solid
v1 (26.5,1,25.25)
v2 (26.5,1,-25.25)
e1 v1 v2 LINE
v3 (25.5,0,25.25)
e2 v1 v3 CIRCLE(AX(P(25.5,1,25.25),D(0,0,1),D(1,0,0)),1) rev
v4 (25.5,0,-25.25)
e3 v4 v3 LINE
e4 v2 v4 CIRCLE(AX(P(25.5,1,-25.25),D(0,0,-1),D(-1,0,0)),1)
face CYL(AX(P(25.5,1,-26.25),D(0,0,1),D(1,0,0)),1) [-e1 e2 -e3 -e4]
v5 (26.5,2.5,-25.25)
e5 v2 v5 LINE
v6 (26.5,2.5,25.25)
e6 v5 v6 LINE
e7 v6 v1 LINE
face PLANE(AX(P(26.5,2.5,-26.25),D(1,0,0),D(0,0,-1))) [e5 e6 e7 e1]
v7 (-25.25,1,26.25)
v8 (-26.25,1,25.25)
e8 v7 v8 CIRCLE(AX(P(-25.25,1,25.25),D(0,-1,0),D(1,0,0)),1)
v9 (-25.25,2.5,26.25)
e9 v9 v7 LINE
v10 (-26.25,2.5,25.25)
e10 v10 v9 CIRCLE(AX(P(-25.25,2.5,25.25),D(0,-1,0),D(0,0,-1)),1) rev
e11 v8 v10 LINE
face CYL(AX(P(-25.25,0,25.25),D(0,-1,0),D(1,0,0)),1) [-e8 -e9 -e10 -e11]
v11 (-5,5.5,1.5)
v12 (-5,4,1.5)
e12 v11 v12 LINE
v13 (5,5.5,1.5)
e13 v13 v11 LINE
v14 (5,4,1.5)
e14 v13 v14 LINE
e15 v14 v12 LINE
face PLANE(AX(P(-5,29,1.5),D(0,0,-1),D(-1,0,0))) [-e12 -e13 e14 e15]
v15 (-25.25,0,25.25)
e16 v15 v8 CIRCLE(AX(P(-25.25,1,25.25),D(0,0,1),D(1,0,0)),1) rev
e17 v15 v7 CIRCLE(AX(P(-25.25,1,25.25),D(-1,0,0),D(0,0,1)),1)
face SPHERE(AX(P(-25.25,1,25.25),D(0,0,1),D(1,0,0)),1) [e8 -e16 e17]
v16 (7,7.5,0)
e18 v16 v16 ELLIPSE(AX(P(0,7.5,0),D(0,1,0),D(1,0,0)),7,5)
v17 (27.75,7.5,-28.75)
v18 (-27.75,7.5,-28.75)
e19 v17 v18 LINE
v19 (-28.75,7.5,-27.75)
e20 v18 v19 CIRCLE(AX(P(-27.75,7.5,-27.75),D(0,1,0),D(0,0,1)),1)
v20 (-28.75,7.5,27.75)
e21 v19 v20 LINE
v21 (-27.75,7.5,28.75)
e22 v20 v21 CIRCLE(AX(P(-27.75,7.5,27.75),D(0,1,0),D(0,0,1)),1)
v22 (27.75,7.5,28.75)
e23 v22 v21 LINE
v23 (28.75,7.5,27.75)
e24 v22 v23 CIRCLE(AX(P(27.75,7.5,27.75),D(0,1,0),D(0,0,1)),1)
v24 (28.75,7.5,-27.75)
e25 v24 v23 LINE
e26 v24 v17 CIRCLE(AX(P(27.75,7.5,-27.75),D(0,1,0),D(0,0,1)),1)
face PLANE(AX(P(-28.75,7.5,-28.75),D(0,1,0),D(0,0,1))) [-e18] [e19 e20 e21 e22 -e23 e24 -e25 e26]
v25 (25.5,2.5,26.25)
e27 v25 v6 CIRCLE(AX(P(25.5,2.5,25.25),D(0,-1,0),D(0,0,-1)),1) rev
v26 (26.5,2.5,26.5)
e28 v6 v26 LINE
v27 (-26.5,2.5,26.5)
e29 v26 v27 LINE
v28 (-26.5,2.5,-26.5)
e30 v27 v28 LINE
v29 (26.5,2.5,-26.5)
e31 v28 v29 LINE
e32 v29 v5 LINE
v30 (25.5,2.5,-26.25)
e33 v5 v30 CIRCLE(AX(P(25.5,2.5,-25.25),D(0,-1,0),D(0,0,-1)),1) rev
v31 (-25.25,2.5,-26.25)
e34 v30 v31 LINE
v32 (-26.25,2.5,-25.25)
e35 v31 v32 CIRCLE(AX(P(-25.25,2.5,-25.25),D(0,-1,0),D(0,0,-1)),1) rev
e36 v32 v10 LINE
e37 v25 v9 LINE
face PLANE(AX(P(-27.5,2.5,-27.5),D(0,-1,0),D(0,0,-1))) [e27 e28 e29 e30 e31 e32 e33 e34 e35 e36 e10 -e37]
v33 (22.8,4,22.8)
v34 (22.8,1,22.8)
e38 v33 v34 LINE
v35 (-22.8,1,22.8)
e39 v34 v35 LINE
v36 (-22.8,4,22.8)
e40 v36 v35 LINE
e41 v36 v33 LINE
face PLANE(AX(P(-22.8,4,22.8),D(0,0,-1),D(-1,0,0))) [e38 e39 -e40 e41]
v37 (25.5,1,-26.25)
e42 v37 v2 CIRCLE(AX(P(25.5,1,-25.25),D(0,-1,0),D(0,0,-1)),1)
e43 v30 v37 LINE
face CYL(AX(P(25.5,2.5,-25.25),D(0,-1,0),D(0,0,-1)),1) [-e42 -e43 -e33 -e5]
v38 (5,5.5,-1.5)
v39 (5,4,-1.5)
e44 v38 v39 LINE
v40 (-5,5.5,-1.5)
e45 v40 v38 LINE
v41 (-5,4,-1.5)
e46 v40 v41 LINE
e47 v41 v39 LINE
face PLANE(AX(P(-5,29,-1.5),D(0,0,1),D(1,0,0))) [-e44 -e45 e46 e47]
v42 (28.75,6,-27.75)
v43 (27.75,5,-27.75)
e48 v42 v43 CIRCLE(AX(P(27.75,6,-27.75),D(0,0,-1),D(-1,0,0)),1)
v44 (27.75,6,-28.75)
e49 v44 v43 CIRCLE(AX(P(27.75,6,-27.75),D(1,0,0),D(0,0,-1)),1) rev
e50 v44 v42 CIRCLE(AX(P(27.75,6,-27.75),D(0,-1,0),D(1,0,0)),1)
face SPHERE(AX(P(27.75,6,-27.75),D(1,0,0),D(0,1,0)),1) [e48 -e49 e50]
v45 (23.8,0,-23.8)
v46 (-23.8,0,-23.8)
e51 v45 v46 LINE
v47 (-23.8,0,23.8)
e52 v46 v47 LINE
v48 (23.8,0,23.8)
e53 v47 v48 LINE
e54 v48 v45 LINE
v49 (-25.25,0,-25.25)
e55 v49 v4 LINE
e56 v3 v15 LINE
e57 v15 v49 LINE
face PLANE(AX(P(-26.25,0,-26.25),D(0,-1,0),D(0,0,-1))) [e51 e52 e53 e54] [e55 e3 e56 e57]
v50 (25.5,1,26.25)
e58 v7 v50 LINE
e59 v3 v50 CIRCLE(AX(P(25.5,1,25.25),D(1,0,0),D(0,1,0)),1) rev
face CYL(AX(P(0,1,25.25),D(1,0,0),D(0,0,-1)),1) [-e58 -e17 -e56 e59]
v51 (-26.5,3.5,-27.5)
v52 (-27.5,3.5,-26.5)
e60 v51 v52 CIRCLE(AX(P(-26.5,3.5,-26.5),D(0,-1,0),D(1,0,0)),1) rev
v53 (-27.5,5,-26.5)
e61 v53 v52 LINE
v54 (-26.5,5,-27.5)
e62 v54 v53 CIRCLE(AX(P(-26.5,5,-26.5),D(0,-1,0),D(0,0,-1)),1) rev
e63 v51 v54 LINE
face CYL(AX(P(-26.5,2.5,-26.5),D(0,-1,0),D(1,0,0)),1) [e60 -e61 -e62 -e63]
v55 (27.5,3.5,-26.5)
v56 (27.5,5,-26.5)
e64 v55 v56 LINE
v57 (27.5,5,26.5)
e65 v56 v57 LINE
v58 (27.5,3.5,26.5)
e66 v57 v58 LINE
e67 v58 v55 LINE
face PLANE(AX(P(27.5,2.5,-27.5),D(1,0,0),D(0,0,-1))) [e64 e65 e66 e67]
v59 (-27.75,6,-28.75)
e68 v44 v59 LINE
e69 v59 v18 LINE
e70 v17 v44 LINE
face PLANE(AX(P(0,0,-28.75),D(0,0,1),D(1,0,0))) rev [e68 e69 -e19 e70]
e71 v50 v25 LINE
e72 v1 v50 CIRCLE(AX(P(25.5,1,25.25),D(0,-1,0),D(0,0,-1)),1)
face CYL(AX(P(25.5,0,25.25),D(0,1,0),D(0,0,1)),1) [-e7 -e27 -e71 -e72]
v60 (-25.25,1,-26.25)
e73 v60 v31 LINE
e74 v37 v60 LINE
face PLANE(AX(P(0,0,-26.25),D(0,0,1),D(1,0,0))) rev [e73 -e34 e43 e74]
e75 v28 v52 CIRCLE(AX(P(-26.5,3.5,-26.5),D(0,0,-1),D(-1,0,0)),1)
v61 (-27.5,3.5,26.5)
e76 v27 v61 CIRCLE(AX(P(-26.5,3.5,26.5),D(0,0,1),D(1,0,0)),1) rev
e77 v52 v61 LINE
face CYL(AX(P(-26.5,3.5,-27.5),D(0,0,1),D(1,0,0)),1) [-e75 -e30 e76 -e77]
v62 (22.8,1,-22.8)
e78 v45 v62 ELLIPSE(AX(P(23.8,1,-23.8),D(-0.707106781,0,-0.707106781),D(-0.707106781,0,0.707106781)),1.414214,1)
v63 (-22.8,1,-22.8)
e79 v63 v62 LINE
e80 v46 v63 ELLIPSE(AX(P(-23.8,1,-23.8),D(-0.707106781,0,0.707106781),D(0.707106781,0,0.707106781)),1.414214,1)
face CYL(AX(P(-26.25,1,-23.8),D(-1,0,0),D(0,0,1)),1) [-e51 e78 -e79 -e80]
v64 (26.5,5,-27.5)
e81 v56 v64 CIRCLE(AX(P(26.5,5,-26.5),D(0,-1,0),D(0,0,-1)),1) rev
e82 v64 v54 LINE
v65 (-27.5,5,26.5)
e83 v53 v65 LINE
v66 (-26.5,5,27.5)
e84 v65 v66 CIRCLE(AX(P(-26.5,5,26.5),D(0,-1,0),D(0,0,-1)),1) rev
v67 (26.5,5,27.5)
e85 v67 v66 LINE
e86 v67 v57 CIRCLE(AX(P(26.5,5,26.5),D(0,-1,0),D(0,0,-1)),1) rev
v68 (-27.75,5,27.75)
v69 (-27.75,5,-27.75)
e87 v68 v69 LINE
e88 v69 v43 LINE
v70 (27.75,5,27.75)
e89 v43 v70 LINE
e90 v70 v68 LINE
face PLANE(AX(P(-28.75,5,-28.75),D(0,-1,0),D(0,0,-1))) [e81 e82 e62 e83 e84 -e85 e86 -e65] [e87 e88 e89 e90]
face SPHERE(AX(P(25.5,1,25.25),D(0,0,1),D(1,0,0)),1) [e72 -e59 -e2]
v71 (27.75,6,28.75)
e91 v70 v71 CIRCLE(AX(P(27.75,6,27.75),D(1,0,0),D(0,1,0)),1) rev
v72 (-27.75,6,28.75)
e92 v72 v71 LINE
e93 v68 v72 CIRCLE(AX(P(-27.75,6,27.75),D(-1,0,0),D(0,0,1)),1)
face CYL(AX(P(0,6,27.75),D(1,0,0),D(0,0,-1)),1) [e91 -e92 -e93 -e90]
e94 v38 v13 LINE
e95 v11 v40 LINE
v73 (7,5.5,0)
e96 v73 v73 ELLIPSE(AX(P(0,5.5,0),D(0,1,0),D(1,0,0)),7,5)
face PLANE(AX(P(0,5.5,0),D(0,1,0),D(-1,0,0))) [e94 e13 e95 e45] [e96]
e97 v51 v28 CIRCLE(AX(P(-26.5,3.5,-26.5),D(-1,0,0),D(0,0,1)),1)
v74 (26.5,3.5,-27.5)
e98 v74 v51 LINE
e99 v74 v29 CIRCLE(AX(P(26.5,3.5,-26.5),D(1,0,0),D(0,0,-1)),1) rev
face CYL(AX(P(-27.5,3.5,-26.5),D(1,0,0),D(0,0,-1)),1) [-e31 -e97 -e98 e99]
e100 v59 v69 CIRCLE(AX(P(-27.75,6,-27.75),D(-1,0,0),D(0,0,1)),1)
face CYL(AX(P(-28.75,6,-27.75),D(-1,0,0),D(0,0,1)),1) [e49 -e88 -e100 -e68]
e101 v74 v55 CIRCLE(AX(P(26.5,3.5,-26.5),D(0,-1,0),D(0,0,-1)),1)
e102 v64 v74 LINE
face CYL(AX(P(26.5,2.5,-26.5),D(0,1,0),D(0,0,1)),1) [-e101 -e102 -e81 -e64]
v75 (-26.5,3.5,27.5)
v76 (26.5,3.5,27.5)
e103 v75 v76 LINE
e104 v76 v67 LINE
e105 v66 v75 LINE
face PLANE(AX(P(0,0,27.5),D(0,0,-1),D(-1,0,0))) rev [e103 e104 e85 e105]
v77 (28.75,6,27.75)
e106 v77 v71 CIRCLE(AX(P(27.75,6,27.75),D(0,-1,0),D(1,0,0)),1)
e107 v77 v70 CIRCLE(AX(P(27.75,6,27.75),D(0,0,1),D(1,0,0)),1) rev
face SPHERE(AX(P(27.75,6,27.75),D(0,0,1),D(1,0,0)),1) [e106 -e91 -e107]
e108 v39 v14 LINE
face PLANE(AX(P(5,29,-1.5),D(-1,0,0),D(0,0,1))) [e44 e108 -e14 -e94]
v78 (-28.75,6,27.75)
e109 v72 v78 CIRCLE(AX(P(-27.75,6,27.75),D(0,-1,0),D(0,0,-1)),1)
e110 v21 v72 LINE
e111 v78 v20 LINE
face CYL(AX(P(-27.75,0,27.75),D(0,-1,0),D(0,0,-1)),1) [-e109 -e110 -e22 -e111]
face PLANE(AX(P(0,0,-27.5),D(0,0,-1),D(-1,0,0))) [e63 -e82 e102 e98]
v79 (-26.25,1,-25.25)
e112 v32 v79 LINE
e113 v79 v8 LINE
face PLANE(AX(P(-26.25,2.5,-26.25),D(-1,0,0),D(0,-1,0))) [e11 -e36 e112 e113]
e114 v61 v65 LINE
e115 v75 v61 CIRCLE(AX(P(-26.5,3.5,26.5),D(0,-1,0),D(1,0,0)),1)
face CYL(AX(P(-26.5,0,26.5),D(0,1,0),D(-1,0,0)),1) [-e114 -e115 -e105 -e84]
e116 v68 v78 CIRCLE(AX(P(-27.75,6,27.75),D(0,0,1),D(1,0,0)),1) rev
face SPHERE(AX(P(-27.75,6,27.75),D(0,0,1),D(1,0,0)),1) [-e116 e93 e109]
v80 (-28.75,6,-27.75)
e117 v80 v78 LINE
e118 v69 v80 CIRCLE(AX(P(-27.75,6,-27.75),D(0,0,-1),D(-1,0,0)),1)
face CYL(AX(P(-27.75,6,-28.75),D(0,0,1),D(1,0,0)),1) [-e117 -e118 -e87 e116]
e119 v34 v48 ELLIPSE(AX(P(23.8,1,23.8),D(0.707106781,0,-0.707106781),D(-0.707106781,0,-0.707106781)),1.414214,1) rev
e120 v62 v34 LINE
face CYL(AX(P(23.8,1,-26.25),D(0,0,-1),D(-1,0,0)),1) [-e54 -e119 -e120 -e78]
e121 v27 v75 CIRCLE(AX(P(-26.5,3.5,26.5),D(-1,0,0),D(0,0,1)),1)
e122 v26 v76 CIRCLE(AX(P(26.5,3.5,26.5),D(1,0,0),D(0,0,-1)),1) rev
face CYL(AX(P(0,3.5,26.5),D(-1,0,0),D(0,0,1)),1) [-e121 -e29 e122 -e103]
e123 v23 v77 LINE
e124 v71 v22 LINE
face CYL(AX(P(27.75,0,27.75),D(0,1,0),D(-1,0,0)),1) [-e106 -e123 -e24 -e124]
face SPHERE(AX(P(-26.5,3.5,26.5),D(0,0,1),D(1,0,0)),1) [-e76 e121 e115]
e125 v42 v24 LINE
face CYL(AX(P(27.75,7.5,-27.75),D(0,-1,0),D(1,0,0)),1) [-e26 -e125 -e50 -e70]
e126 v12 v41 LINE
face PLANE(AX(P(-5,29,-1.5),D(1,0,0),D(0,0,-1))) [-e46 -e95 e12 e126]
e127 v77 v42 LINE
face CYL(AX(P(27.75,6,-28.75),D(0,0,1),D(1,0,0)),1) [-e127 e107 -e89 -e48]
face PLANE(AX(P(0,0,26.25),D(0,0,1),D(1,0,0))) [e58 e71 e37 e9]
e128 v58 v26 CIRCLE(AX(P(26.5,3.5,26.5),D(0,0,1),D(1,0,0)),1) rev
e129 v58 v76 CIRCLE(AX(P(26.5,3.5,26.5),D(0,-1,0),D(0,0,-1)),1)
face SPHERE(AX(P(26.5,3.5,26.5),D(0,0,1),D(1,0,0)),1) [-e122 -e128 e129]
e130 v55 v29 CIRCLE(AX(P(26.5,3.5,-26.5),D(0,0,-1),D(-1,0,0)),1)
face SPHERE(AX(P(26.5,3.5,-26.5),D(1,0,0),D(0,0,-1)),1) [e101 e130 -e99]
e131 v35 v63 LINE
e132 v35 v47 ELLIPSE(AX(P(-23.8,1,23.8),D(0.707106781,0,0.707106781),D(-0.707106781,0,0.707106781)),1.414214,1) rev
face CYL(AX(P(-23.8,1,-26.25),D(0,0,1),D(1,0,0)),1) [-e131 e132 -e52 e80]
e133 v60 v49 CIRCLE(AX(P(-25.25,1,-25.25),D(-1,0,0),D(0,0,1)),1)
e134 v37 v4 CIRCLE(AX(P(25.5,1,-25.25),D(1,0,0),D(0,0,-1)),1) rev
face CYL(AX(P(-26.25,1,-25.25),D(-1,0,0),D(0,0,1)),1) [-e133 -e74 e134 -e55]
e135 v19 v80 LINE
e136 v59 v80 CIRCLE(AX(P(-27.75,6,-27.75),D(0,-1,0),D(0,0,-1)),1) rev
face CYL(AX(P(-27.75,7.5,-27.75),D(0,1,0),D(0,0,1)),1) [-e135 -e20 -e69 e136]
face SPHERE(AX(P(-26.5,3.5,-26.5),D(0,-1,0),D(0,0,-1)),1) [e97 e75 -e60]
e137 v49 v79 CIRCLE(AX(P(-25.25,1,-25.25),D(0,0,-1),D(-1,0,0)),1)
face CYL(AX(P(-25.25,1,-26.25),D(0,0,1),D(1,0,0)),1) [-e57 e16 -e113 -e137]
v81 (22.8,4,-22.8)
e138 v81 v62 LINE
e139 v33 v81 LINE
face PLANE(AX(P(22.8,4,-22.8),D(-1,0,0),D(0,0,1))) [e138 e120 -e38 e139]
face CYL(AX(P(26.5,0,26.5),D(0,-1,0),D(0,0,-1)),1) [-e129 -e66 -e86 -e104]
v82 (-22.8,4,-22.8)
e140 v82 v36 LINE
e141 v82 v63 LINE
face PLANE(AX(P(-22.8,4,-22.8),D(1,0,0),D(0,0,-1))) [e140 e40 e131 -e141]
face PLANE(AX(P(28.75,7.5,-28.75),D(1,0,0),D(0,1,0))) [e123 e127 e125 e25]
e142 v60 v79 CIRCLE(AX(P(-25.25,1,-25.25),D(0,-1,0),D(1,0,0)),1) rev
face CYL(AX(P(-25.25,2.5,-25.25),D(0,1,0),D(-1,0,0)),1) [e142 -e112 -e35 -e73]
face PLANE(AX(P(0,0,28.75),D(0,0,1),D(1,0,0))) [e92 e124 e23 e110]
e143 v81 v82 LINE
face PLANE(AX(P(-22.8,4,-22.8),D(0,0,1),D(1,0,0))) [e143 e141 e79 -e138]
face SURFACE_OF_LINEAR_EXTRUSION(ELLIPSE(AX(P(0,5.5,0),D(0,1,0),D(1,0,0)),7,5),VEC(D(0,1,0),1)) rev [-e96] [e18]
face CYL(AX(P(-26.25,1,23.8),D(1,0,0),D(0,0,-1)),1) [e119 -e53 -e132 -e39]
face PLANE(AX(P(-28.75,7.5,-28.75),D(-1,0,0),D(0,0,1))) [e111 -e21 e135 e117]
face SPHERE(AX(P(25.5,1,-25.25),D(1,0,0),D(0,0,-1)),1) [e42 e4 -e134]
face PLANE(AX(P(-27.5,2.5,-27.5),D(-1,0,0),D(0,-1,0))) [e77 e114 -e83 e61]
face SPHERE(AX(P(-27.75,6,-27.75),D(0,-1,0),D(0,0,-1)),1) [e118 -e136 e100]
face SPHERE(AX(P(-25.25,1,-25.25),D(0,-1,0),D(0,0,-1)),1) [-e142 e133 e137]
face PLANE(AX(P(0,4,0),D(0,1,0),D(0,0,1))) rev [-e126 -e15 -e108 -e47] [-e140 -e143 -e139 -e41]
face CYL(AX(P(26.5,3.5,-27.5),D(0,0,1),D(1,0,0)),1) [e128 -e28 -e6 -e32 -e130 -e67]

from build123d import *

# Parameters (mm, degrees)
BOSS_EXTRUDE4_DEPTH      = 26.25
BOSS_EXTRUDE4_DEPTH_BACK = 26.25
SKETCH7_W                = 52.75
SKETCH7_H                = 2.5
BOSS_EXTRUDE5_DEPTH      = 27.5
BOSS_EXTRUDE5_DEPTH_BACK = 27.5
SKETCH8_W                = 55
SKETCH8_H                = 2.5
BOSS_EXTRUDE6_DEPTH      = 28.75
BOSS_EXTRUDE6_DEPTH_BACK = 28.75
SKETCH9_W                = 57.5
SKETCH9_H                = 2.5
CUT_EXTRUDE1_DEPTH       = 4
CUT_EXTRUDE1_DEPTH_BACK  = 4.5
SKETCH10_W               = 45.6
SKETCH10_H               = 45.6
SKETCH12_RX              = 7
SKETCH12_RY              = 5
CUT_EXTRUDE2_DEPTH       = 2
CUT_EXTRUDE3_DEPTH       = 29
CUT_EXTRUDE3_DEPTH_BACK  = 42.344588521
SKETCH13_W               = 10
SKETCH13_H               = 3
FILLET4_R                = 1


with BuildPart() as part:
    # Sketch7 → Boss-Extrude4 (new, two sides: drawn at the far end of the back side and taken through both)
    with BuildSketch(Plane.XY.offset(-BOSS_EXTRUDE4_DEPTH_BACK)):
        with Locations((0.125, 1.25)):
            Rectangle(SKETCH7_W, SKETCH7_H)
    extrude(amount=BOSS_EXTRUDE4_DEPTH + BOSS_EXTRUDE4_DEPTH_BACK)

    # Sketch8 → Boss-Extrude5 (add, two sides: drawn at the far end of the back side and taken through both)
    with BuildSketch(Plane.XY.offset(-BOSS_EXTRUDE5_DEPTH_BACK)):
        with Locations((0, 3.75)):
            Rectangle(SKETCH8_W, SKETCH8_H)
    extrude(amount=BOSS_EXTRUDE5_DEPTH + BOSS_EXTRUDE5_DEPTH_BACK)

    # Sketch9 → Boss-Extrude6 (add, two sides: drawn at the far end of the back side and taken through both)
    with BuildSketch(Plane.XY.offset(-BOSS_EXTRUDE6_DEPTH_BACK)):
        with Locations((0, 6.25)):
            Rectangle(SKETCH9_W, SKETCH9_H)
    extrude(amount=BOSS_EXTRUDE6_DEPTH + BOSS_EXTRUDE6_DEPTH_BACK)

    # Sketch10 → Cut-Extrude1 (cut, two sides: drawn at the far end of the back side and taken through both)
    with BuildSketch(Plane(origin=(0, 0, 0), x_dir=(1, 0, 0), z_dir=(0, 1, 0)).offset(-CUT_EXTRUDE1_DEPTH_BACK)):
        Rectangle(SKETCH10_W, SKETCH10_H)
    extrude(amount=CUT_EXTRUDE1_DEPTH + CUT_EXTRUDE1_DEPTH_BACK, mode=Mode.SUBTRACT)

    # Sketch12 → Cut-Extrude2 (cut)
    with BuildSketch(Plane(origin=(0, 7.5, 0), x_dir=(1, 0, 0), z_dir=(0, 1, 0))):
        with Locations((0, 0)):
            Ellipse(SKETCH12_RX, SKETCH12_RY)
    extrude(amount=-CUT_EXTRUDE2_DEPTH, mode=Mode.SUBTRACT)

    # Sketch13 → Cut-Extrude3 (cut, two sides: drawn at the far end of the back side and taken through both)
    with BuildSketch(Plane(origin=(0, 0, 0), x_dir=(1, 0, 0), z_dir=(0, 1, 0)).offset(-CUT_EXTRUDE3_DEPTH_BACK)):
        Rectangle(SKETCH13_W, SKETCH13_H)
    extrude(amount=CUT_EXTRUDE3_DEPTH + CUT_EXTRUDE3_DEPTH_BACK, mode=Mode.SUBTRACT)

    # Fillet4
    fillet4_edges = [part.edges().sort_by_distance(p)[0] for p in [
        (-26.25, 1.25, 26.25),
        (26.5, 1.25, -26.25),
        (0.125, 0, 26.25),
        (26.5, 1.25, 26.25),
        (-27.5, 2.5, 0),
        (-27.5, 3.75, -27.5),
        (27.5, 3.75, -27.5),
        (27.5, 2.5, 0),
        (0, 2.5, -27.5),
        (-27.5, 3.75, 27.5),
        (0, 2.5, 27.5),
        (27.5, 3.75, 27.5),
        (-28.75, 5, 0),
        (-28.75, 6.25, -28.75),
        (28.75, 6.25, -28.75),
        (28.75, 5, 0),
        (0, 5, -28.75),
        (-28.75, 6.25, 28.75),
        (0, 5, 28.75),
        (28.75, 6.25, 28.75),
        (-26.25, 1.25, -26.25),
        (0, 0, -22.8),
        (22.8, 0, 0),
        (0, 0, 22.8),
        (-22.8, 0, 0),
        (26.5, 0, 0),
        (-26.25, 0, 0),
        (0.125, 0, -26.25),
    ]]
    fillet(fillet4_edges, radius=FILLET4_R - 0.0001)  # a hair under: the kernel refuses the full size


solid = part.part
